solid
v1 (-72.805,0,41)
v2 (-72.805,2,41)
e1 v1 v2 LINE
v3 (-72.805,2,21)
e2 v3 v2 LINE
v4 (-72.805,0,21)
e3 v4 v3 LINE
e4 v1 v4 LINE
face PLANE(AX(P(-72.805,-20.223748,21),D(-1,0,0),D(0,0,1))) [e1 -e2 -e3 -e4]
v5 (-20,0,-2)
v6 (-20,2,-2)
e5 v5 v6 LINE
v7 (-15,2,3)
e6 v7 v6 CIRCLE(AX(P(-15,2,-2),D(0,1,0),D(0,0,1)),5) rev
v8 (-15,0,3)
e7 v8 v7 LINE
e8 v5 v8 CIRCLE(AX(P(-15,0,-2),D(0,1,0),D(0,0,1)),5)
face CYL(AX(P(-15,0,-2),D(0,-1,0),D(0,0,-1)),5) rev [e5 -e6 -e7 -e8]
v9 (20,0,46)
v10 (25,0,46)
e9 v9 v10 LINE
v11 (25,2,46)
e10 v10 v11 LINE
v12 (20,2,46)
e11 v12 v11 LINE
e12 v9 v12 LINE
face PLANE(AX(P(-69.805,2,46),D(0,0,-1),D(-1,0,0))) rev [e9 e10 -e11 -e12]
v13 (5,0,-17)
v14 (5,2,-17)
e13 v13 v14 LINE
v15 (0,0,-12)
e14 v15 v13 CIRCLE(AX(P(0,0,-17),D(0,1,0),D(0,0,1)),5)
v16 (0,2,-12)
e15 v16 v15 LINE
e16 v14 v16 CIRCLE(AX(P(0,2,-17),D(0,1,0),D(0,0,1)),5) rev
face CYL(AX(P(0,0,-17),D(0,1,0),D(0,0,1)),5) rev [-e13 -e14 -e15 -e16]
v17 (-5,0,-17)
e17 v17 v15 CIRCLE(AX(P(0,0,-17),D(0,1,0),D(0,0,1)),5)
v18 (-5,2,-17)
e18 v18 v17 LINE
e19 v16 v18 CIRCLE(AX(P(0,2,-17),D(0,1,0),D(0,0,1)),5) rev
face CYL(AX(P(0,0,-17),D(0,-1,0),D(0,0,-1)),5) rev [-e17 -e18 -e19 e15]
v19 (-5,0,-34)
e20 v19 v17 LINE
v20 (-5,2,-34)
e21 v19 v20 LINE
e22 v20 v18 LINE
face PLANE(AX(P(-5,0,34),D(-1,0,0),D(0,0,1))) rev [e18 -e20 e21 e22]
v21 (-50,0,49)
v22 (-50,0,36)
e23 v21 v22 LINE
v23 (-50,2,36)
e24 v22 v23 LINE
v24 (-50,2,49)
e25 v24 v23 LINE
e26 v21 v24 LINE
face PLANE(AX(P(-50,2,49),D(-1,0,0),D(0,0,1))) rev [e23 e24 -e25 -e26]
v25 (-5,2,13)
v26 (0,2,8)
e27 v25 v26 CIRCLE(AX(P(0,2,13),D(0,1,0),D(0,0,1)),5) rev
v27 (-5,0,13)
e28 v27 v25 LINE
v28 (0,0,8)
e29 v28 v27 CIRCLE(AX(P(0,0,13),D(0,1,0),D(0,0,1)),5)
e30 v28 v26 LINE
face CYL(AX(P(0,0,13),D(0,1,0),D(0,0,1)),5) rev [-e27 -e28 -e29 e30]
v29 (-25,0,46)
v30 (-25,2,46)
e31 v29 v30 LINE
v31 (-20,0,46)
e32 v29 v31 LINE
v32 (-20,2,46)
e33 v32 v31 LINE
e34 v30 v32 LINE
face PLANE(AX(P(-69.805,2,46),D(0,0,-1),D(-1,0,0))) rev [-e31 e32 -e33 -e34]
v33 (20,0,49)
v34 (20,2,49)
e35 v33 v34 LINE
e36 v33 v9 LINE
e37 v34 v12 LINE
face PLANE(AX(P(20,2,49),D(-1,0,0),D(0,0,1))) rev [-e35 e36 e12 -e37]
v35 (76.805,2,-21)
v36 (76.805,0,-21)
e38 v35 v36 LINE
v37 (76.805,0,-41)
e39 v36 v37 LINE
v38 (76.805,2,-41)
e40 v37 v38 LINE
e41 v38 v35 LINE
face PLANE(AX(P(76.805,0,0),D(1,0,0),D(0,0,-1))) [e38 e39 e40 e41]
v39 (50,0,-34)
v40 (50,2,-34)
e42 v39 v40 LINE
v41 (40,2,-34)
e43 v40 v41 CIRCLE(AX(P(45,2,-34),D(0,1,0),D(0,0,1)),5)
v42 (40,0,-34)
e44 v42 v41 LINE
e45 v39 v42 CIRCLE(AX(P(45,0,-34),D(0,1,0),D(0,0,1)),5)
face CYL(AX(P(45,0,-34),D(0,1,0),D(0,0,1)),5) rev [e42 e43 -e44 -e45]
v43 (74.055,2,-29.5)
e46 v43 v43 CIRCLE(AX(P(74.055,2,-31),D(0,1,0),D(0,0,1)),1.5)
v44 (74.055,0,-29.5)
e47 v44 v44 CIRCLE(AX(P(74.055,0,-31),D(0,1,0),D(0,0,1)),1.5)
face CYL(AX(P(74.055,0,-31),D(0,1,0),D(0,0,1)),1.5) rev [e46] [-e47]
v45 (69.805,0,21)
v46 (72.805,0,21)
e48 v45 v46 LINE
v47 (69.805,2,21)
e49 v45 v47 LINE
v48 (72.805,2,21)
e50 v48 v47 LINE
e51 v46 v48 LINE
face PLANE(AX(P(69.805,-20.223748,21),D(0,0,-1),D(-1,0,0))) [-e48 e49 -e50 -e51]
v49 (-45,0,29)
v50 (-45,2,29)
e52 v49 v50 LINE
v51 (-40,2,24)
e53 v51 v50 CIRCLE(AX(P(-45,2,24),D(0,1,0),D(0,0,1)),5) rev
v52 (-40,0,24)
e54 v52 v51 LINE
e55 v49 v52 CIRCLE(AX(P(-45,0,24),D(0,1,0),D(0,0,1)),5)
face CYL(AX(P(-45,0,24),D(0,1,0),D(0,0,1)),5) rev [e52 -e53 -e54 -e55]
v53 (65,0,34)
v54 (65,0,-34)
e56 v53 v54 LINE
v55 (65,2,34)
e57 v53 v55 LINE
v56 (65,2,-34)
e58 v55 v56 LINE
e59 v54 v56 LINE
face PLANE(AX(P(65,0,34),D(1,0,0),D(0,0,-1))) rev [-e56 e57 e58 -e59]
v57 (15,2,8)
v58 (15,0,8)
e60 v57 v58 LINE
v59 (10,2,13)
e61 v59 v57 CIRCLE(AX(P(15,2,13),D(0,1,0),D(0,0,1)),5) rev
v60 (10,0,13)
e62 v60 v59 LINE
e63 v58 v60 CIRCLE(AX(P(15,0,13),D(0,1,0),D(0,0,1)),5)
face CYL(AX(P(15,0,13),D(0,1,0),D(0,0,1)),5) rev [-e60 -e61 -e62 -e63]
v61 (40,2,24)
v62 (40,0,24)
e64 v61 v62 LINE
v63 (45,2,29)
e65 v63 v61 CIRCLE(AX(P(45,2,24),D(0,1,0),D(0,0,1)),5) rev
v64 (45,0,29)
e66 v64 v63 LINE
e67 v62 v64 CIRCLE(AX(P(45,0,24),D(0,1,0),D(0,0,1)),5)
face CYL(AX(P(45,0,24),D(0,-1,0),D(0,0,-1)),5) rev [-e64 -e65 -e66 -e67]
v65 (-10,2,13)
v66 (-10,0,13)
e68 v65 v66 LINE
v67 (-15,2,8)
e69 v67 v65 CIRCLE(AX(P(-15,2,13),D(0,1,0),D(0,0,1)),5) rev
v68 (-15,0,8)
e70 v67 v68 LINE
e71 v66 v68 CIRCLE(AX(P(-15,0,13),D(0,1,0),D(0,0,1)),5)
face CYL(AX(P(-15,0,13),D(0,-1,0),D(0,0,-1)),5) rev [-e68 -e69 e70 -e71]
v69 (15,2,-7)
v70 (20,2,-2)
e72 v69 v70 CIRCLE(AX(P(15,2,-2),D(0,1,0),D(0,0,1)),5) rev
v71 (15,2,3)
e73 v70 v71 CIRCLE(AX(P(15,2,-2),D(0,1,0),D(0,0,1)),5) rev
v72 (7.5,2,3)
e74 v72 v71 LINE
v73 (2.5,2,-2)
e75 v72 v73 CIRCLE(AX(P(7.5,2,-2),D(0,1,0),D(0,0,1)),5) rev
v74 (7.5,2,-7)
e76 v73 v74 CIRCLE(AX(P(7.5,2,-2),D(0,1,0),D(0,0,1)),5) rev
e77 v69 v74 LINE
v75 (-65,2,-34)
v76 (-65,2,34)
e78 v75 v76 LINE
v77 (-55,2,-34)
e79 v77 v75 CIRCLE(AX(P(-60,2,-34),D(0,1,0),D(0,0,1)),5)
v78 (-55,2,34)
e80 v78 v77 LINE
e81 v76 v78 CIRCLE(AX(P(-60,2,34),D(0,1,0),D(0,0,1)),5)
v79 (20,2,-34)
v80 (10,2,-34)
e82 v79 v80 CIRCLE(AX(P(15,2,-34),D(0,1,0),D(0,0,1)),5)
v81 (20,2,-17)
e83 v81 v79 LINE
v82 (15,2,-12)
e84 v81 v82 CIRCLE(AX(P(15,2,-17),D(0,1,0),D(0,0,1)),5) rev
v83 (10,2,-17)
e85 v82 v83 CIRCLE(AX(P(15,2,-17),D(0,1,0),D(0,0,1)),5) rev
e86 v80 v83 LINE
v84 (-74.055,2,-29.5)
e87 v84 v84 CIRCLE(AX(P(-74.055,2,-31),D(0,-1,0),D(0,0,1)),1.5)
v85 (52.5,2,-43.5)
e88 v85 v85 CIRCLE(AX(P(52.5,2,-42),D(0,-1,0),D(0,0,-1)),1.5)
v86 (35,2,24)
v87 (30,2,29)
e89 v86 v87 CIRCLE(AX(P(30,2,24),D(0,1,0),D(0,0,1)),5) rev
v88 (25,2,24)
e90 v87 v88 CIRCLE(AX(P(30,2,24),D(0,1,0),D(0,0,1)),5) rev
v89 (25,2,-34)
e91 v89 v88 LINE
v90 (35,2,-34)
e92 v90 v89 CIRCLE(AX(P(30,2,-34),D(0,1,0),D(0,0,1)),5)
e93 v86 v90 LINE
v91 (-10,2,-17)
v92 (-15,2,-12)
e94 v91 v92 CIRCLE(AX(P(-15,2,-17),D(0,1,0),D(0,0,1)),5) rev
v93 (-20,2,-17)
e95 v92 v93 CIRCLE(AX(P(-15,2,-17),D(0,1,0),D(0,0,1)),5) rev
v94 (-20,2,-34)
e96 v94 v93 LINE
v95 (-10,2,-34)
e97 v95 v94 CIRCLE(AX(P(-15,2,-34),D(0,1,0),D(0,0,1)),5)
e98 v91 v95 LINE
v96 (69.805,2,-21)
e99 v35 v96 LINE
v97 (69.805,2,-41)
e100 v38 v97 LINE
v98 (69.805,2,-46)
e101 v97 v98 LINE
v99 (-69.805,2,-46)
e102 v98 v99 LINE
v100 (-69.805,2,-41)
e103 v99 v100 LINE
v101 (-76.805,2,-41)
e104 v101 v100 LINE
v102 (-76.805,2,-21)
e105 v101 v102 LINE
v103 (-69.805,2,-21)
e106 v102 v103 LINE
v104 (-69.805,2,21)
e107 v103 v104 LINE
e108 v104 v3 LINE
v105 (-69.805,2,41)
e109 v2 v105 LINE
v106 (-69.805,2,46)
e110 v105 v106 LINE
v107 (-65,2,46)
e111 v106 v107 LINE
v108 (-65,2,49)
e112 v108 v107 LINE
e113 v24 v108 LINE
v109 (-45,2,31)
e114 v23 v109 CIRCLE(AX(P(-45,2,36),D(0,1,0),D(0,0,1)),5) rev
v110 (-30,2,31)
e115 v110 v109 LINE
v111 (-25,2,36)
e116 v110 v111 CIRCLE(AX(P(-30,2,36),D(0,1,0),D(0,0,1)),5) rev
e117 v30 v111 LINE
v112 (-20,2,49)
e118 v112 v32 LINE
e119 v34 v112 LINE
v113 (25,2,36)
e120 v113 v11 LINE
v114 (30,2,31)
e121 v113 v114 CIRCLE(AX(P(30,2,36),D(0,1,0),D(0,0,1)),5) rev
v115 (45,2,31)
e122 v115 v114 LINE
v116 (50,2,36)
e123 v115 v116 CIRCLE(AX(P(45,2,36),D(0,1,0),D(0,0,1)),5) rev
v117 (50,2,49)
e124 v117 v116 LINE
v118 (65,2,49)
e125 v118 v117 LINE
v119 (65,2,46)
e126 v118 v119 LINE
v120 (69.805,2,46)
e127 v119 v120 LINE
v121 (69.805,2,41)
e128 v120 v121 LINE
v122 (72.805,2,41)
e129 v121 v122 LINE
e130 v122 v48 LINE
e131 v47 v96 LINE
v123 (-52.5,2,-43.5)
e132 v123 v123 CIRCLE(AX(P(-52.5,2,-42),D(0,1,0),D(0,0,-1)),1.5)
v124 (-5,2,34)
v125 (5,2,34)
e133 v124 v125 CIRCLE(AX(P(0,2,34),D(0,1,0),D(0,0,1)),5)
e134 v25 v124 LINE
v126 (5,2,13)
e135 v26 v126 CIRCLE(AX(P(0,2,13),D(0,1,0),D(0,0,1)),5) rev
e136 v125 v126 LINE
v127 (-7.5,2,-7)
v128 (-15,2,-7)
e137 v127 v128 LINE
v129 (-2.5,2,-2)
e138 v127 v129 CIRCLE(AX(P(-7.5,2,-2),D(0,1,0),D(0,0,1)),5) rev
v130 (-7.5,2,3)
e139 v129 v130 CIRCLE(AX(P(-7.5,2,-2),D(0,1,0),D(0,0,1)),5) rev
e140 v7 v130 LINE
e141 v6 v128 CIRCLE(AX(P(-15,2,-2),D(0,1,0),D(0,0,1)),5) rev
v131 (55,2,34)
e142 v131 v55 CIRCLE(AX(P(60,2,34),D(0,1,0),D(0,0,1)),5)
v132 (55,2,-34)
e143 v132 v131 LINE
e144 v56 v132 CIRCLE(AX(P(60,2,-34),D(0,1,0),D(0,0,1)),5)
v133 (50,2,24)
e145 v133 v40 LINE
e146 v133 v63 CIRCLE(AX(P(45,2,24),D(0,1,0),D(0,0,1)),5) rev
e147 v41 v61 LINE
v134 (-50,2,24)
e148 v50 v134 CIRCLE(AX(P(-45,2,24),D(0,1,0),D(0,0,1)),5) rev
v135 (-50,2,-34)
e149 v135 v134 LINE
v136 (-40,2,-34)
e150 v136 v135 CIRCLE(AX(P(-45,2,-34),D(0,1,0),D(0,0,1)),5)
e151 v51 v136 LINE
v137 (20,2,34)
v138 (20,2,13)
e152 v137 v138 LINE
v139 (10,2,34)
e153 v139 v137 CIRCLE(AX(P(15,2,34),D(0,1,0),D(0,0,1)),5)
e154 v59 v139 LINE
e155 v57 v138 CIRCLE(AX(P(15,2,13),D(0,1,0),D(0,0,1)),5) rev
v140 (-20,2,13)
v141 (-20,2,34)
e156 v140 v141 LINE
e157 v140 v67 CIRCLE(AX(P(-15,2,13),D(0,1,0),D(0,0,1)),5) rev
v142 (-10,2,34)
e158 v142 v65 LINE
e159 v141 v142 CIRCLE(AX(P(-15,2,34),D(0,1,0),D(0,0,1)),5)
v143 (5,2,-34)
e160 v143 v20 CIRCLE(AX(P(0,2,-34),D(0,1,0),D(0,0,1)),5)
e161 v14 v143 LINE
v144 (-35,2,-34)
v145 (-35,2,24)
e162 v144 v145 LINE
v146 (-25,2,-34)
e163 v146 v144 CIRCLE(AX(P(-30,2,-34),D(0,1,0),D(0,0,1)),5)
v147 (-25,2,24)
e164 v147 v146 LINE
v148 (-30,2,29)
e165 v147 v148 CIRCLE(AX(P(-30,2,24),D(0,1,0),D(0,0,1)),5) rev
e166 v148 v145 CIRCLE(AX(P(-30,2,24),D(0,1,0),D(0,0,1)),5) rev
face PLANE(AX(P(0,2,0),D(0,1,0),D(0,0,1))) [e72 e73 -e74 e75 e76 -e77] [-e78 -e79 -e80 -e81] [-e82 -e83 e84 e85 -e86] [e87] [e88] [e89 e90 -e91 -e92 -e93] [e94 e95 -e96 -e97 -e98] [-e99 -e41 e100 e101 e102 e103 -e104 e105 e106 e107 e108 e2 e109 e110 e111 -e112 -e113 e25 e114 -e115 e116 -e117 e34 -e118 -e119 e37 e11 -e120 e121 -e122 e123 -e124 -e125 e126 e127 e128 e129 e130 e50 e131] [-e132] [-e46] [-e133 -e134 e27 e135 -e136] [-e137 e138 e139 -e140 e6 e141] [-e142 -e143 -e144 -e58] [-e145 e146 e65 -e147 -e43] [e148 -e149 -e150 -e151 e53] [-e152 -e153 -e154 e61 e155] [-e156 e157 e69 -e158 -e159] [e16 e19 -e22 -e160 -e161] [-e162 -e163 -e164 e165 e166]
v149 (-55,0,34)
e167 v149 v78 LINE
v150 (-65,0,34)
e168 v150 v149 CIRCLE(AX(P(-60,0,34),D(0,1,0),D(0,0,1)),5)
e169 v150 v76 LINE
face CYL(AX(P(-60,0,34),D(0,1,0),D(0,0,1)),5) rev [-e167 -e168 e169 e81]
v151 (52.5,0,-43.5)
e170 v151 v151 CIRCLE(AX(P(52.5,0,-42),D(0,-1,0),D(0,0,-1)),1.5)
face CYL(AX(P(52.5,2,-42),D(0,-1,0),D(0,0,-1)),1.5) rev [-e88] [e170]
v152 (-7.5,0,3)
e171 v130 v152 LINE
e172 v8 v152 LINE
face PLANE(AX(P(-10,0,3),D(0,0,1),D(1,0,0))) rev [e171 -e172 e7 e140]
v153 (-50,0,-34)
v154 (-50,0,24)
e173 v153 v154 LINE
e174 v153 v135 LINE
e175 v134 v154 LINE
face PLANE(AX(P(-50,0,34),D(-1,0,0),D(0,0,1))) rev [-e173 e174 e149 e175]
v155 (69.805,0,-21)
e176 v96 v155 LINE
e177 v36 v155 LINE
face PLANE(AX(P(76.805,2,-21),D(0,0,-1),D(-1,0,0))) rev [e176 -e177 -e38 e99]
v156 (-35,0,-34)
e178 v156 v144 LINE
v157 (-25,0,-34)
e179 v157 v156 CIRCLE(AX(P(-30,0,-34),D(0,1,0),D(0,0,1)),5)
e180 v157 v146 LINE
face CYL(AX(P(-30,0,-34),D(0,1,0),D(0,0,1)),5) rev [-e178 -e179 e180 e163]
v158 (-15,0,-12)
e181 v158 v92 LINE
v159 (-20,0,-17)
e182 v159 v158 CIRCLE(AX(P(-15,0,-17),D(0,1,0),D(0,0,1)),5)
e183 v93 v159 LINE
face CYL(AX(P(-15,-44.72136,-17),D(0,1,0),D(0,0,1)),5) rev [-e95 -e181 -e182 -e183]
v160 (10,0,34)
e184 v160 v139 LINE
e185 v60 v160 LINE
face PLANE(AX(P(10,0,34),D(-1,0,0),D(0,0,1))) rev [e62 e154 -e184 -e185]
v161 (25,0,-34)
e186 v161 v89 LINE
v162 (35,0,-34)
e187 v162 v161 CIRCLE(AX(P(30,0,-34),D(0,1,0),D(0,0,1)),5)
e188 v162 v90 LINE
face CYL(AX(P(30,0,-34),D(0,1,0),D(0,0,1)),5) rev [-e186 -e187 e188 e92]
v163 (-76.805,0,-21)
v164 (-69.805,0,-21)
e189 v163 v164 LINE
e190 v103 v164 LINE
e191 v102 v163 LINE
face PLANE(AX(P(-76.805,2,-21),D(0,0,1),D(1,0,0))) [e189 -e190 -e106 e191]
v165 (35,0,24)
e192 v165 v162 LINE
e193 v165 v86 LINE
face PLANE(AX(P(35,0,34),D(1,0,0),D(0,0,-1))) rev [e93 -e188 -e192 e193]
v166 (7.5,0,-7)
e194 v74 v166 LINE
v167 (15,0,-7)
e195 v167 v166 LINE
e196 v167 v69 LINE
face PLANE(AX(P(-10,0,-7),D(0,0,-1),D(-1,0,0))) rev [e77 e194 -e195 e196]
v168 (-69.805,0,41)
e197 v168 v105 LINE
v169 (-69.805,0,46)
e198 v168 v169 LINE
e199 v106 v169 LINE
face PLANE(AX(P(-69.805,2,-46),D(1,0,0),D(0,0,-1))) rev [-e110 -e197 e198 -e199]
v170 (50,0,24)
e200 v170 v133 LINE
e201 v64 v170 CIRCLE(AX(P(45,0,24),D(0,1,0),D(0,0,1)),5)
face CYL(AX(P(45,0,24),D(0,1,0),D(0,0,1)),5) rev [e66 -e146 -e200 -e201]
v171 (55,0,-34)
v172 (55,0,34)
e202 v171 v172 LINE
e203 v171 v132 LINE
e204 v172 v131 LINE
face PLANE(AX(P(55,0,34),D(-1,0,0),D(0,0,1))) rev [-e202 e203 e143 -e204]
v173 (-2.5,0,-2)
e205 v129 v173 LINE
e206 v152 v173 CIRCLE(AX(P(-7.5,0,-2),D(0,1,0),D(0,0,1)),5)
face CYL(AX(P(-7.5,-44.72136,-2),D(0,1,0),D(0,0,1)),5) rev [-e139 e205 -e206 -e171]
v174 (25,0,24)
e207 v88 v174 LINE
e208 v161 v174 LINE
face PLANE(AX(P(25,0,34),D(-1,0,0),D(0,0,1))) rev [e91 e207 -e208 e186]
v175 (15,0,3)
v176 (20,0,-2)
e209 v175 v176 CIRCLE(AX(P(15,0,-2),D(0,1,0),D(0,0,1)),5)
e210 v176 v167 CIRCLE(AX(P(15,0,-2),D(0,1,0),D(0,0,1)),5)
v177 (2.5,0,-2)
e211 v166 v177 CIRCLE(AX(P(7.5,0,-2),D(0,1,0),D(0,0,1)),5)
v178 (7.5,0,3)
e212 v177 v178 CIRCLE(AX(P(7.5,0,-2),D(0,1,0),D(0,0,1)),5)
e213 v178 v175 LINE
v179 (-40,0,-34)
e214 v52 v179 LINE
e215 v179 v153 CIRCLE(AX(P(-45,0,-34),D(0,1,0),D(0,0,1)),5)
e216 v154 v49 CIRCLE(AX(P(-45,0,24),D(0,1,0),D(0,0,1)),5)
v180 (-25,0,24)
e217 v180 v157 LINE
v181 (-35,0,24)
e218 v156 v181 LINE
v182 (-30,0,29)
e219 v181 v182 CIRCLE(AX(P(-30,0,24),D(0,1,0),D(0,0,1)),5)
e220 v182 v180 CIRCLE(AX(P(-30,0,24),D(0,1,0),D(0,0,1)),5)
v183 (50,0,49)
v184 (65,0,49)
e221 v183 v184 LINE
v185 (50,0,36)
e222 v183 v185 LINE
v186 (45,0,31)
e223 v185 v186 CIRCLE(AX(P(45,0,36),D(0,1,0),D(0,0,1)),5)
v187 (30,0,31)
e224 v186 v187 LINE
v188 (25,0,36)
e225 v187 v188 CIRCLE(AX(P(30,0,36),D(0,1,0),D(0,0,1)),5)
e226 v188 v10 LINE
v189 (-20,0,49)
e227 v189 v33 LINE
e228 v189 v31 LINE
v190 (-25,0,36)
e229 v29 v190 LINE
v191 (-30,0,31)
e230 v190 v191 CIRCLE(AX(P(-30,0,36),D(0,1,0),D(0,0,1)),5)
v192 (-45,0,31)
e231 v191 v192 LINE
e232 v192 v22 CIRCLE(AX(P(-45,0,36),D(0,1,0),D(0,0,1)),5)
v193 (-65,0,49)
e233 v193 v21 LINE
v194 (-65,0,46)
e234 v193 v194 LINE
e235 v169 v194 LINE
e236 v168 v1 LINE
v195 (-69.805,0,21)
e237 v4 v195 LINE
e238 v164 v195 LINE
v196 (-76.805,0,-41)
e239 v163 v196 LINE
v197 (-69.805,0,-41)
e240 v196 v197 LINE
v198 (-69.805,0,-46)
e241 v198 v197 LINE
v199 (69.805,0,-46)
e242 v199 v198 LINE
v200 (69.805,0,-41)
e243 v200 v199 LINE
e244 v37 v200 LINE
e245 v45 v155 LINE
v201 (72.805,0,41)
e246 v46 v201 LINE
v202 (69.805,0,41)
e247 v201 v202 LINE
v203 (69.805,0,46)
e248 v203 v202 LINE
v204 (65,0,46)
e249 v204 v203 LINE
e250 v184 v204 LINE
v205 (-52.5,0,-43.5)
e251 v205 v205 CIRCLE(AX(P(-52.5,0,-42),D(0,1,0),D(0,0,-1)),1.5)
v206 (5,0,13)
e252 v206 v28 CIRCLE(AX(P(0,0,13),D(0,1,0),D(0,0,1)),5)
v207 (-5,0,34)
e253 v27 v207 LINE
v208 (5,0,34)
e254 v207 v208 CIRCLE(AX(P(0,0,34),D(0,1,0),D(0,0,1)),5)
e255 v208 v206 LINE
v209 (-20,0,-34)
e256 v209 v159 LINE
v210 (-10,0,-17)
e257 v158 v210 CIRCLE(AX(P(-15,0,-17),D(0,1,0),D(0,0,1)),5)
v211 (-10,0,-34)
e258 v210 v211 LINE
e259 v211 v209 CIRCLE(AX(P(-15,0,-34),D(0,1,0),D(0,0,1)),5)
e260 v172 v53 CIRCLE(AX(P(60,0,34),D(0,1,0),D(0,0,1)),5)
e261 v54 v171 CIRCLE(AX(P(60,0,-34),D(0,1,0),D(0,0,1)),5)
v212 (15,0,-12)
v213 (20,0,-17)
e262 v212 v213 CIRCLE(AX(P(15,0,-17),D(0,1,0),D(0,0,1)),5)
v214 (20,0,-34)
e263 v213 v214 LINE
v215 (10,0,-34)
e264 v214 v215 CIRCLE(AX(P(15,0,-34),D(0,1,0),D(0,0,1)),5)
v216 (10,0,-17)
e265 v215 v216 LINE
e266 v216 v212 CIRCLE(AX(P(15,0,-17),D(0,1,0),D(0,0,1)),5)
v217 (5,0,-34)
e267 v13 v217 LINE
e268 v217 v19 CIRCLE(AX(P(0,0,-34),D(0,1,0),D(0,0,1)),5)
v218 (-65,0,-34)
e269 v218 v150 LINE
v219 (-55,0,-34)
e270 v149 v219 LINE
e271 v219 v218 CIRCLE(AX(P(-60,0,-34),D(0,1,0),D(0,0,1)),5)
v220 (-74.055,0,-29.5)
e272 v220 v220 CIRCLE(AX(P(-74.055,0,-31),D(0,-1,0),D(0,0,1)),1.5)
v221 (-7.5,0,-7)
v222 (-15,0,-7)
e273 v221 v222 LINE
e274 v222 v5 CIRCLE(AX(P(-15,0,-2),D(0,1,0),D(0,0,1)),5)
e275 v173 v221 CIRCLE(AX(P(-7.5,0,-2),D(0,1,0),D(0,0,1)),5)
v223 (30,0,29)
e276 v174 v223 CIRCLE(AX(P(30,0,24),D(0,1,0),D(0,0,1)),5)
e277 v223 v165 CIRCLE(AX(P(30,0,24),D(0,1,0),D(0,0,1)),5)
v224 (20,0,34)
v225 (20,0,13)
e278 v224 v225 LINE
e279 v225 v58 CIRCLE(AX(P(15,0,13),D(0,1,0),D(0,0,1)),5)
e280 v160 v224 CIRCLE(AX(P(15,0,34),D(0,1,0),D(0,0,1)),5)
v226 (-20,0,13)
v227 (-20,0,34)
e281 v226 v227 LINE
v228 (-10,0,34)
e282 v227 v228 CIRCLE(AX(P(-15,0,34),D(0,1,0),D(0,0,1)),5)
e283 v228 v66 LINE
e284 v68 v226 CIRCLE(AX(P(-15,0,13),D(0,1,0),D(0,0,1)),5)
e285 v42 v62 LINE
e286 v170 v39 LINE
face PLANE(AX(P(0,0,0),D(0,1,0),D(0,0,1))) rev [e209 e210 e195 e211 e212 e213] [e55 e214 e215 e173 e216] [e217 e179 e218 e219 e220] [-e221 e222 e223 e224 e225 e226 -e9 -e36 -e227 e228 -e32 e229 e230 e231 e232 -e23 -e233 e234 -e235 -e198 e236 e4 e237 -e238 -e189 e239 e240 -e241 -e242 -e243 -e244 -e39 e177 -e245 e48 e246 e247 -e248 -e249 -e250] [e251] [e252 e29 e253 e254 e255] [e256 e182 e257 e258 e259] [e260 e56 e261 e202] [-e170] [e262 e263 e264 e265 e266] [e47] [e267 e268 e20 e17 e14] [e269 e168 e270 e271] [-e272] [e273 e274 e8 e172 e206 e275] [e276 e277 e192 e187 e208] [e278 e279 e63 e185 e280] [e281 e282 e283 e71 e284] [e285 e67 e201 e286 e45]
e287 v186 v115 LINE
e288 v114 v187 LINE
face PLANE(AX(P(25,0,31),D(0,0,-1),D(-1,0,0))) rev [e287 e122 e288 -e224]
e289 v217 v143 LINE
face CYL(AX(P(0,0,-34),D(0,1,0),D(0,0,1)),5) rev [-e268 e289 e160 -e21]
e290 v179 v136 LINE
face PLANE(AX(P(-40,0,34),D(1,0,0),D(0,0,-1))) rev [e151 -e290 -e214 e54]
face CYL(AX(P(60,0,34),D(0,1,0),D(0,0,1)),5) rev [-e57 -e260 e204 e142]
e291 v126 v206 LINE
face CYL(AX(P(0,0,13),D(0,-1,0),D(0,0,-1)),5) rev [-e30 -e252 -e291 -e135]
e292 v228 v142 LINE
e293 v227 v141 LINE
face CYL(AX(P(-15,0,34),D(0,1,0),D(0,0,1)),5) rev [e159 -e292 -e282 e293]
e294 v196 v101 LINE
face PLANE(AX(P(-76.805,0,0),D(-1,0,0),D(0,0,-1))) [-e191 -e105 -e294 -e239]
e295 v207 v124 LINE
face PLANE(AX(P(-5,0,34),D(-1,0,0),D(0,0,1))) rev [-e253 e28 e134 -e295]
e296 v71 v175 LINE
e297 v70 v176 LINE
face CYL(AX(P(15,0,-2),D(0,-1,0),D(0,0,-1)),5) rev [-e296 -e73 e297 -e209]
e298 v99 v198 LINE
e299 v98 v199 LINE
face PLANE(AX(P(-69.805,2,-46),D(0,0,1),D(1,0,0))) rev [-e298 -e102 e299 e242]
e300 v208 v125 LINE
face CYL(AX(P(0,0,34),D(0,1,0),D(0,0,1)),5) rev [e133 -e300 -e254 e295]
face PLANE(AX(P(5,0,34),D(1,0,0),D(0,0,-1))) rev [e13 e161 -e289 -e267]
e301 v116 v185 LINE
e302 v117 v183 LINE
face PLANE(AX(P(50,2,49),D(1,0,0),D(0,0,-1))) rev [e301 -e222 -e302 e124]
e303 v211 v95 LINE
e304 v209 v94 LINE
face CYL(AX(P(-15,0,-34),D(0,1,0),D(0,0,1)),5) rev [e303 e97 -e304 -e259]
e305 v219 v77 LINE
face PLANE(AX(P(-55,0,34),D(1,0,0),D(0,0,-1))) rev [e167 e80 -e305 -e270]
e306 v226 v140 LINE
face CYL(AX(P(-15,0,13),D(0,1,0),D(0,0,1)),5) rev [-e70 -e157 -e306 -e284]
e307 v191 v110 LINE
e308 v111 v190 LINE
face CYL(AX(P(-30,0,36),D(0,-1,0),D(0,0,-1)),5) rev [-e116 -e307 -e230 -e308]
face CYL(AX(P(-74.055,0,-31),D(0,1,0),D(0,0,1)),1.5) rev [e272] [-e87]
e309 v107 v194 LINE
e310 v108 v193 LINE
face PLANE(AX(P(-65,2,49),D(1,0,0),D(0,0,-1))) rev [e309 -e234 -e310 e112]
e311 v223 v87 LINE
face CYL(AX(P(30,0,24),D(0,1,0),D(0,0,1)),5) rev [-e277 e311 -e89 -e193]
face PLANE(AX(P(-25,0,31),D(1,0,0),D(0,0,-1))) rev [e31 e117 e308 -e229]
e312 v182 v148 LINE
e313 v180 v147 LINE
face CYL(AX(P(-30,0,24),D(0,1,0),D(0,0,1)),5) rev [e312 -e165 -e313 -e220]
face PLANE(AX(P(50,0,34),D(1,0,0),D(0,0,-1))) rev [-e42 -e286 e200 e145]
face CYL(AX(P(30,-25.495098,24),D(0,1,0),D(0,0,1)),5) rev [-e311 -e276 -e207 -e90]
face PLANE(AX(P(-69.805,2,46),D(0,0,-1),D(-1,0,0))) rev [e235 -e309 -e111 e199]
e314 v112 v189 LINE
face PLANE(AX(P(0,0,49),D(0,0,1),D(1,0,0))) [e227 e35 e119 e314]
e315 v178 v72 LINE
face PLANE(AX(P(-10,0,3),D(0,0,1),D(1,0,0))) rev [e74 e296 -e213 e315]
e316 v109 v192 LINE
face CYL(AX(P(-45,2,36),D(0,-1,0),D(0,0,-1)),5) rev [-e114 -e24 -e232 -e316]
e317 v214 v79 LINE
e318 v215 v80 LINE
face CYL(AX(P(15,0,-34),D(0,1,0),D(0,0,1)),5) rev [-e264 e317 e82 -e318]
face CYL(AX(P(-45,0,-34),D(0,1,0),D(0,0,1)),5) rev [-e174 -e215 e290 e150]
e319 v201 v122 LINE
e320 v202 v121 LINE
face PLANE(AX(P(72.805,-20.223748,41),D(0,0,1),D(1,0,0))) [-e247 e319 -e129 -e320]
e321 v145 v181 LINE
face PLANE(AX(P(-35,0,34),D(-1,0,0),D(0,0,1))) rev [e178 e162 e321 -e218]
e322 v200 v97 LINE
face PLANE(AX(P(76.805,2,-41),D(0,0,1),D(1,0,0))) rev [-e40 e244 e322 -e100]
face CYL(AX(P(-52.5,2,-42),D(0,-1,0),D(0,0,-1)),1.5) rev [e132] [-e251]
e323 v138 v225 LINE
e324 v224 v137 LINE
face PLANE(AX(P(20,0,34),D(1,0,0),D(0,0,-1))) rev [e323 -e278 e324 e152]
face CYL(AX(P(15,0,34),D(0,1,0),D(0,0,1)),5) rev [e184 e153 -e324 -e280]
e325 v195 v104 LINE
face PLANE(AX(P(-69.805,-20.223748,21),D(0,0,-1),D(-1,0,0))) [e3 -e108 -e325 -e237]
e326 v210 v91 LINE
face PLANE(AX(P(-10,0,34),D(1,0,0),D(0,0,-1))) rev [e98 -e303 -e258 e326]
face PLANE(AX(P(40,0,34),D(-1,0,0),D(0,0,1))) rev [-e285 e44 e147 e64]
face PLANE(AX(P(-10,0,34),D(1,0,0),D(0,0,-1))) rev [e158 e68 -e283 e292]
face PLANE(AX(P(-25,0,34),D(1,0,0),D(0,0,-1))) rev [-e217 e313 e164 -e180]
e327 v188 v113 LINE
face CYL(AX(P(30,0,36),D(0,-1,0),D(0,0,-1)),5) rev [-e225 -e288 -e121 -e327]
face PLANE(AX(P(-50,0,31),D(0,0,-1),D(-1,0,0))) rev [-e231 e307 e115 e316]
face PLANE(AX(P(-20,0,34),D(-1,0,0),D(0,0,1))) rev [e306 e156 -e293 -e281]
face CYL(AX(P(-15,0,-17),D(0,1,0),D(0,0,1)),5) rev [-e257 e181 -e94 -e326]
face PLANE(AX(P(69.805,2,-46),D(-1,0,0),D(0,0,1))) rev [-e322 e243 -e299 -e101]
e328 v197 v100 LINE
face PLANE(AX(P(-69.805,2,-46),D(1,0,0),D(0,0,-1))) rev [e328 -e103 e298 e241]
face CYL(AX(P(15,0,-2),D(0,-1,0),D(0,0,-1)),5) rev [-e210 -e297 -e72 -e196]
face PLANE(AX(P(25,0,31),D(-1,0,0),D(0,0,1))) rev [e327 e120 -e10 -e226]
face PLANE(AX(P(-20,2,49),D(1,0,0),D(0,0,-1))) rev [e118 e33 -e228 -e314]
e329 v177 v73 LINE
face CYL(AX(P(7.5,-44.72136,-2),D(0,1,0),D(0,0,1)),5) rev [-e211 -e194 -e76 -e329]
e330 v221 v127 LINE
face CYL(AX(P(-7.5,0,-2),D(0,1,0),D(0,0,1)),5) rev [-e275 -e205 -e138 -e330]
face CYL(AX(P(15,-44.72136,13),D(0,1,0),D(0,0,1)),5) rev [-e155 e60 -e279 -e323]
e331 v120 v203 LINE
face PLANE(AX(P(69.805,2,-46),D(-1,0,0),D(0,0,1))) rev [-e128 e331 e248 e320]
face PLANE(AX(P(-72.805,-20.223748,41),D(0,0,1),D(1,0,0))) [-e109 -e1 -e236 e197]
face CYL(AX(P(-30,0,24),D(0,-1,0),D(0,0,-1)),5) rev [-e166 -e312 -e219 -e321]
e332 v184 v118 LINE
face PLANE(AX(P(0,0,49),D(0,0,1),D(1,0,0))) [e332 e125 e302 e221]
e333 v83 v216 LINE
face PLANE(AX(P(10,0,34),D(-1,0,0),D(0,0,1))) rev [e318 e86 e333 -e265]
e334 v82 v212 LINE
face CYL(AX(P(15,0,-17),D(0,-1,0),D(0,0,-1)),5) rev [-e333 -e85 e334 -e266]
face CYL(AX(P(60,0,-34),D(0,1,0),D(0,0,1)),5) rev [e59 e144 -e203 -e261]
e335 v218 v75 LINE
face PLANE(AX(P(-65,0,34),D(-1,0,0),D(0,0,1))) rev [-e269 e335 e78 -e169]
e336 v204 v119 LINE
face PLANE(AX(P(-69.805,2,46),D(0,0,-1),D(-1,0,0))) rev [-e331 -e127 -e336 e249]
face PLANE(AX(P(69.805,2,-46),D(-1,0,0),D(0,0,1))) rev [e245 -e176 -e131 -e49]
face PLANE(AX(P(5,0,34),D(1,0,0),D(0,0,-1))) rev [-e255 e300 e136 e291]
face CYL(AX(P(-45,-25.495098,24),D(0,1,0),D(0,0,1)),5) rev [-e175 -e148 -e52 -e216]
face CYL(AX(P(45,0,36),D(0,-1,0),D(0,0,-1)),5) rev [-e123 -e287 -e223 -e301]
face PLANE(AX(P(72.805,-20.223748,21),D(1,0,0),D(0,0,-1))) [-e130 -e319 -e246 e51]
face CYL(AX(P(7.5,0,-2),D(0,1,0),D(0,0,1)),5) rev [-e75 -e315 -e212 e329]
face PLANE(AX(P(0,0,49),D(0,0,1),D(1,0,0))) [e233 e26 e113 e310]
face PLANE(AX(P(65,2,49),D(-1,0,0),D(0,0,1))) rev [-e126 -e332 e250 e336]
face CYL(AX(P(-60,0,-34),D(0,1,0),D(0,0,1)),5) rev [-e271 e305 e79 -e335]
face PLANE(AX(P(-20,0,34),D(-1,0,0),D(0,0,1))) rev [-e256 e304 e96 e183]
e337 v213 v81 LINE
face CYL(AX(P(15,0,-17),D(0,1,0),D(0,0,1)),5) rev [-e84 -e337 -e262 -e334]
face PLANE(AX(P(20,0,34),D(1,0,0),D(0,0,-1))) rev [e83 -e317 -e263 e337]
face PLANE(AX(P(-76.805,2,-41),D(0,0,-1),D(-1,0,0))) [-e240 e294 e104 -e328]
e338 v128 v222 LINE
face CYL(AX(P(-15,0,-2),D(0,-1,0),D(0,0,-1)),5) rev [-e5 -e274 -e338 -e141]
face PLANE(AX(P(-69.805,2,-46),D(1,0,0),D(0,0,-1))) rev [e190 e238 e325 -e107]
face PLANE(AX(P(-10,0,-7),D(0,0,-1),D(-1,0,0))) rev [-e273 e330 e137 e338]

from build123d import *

# Parameters (mm, degrees)
SKETCH_1_W             = 139.61
SKETCH_1_H             = 92
EXTRUDE_1_DEPTH        = 2
SKETCH_2_W             = 40
SKETCH_2_H             = 2
SKETCH_2_W_2           = 15
EXTRUDE_2_DEPTH        = 3
SKETCH_3_W             = 20
SKETCH_3_H             = 2
EXTRUDE_3_DEPTH        = 7
SKETCH_4_R             = 1.5
CUT_EXTRUDE_1_DEPTH    = 92.126330031
CUT_EXTRUDE_2_DEPTH    = 92.126330031
PATTERN_LINEAR_1_COUNT = 9
PATTERN_LINEAR_1_PITCH = 15
SKETCH_8_R             = 1.5
CUT_EXTRUDE_4_DEPTH    = 92.126330031
SKETCH_10_W            = 25
SKETCH_10_H            = 5
EXTRUDE_5_DEPTH        = 2
SKETCH_12_W            = 25
SKETCH_12_H            = 15
CUT_EXTRUDE_5_DEPTH    = 92.126330031
FILLET_1_R             = 5
CUT_EXTRUDE_6_DEPTH    = 92.126330031
EXTRUDE_6_DEPTH        = 2
FILLET_2_R             = 5
SKETCH_15_W            = 3
SKETCH_15_H            = 20
EXTRUDE_7_DEPTH        = 2


with BuildPart() as part:
    # 草图1 → 凸台-拉伸1 (new body)
    with BuildSketch(Plane(origin=(0, 0, 0), x_dir=(1, 0, 0), z_dir=(0, 1, 0))):
        Rectangle(SKETCH_1_W, SKETCH_1_H)
    extrude(amount=EXTRUDE_1_DEPTH)

    # 草图2 → 凸台-拉伸2 (add)
    with BuildSketch(Plane.XY.offset(46)):
        with Locations((0, 1)):
            Rectangle(SKETCH_2_W, SKETCH_2_H)
        with Locations((57.5, 1)):
            Rectangle(SKETCH_2_W_2, SKETCH_2_H)
        with Locations((-57.5, 1)):
            Rectangle(SKETCH_2_W_2, SKETCH_2_H)
    extrude(amount=EXTRUDE_2_DEPTH)

    # 草图3 → 凸台-拉伸3 (add)
    with BuildSketch(Plane(origin=(69.805, 0, 0), x_dir=(0, 0, -1), z_dir=(1, 0, 0))):
        with Locations((31, 1)):
            Rectangle(SKETCH_3_W, SKETCH_3_H)
    extrude_3 = extrude(amount=EXTRUDE_3_DEPTH)

    # 草图4 → 切除-拉伸1 (cut, through all)
    with BuildSketch(Plane(origin=(0, 2, 0), x_dir=(1, 0, 0), z_dir=(0, 1, 0))):
        with Locations(Location((74.055, 31, 0), (0, 0, 270))):
            Circle(SKETCH_4_R)
    cut_extrude_1 = extrude(amount=-CUT_EXTRUDE_1_DEPTH, mode=Mode.SUBTRACT)

    # 草图5 → 切除-拉伸2 (cut, through all)
    with BuildSketch(Plane(origin=(0, 2, 0), x_dir=(1, 0, 0), z_dir=(0, 1, 0))):
        with BuildLine():
            Line((-65, -34), (-65, 34))
            ThreePointArc((-65, 34), (-60, 39), (-55, 34))
            Line((-55, 34), (-55, -34))
            ThreePointArc((-55, -34), (-60, -39), (-65, -34))
        make_face()
    cut_extrude_2 = extrude(amount=-CUT_EXTRUDE_2_DEPTH, mode=Mode.SUBTRACT)

    # 阵列(线性)1: 切除-拉伸2 ×9
    with Locations(*[(i * PATTERN_LINEAR_1_PITCH, 0, 0) for i in range(1, PATTERN_LINEAR_1_COUNT)]):
        add(cut_extrude_2, mode=Mode.SUBTRACT)

    # 草图8 → 切除-拉伸4 (cut, through all)
    with BuildSketch(Plane.XZ):
        with Locations(Location((52.5, -42, 0), (0, 0, 270))):
            Circle(SKETCH_8_R)
    cut_extrude_4 = extrude(amount=-CUT_EXTRUDE_4_DEPTH, mode=Mode.SUBTRACT)

    # 镜向4: 切除-拉伸4 across plane
    add(cut_extrude_4.mirror(Plane(origin=(0, 0, 0), x_dir=(0, 0, 1), z_dir=(1, 0, 0))), mode=Mode.SUBTRACT)

    # 草图10 → 凸台-拉伸5 (add)
    with BuildSketch(Plane(origin=(0, 2, 0), x_dir=(1, 0, 0), z_dir=(0, 1, 0))):
        with Locations((37.5, -31.5)):
            Rectangle(SKETCH_10_W, SKETCH_10_H)
        with Locations((-37.5, -31.5)):
            Rectangle(SKETCH_10_W, SKETCH_10_H)
    extrude(amount=-EXTRUDE_5_DEPTH)

    # 草图12 → 切除-拉伸5 (cut, through all)
    with BuildSketch(Plane(origin=(0, 2, 0), x_dir=(1, 0, 0), z_dir=(0, 1, 0))):
        with Locations((-37.5, -38.5)):
            Rectangle(SKETCH_12_W, SKETCH_12_H)
        with Locations((37.5, -38.5)):
            Rectangle(SKETCH_12_W, SKETCH_12_H)
    extrude(amount=-CUT_EXTRUDE_5_DEPTH, mode=Mode.SUBTRACT)

    # 圆角1
    fillet_1_edges = [part.edges().sort_by_distance(p)[0] for p in [
        (-40, 1, 29),
        (-50, 1, 29),
        (-25, 1, 31),
        (-50, 1, 31),
        (50, 1, 31),
        (25, 1, 31),
        (50, 1, 29),
        (40, 1, 29),
        (35, 1, 29),
        (25, 1, 29),
        (-25, 1, 29),
        (-35, 1, 29),
    ]]
    fillet(fillet_1_edges, radius=FILLET_1_R - 0.0001)  # a hair under: the kernel refuses the full size

    # 草图13 → 切除-拉伸6 (cut, through all)
    with BuildSketch(Plane(origin=(0, 2, 0), x_dir=(1, 0, 0), z_dir=(0, 1, 0))):
        with BuildLine():
            Line((-10, 7), (10, 7))
            ThreePointArc((10, 7), (15, 2), (10, -3))
            Line((10, -3), (-10, -3))
            ThreePointArc((-10, -3), (-15, 2), (-10, 7))
        make_face()
    extrude(amount=-CUT_EXTRUDE_6_DEPTH, mode=Mode.SUBTRACT)

    # 草图14 → 凸台-拉伸6 (add)
    with BuildSketch(Plane(origin=(0, 2, 0), x_dir=(1, 0, 0), z_dir=(0, 1, 0))):
        Polygon((20, 7), (2.5, 7), (2.5, -3), (20, -3), (20, -8), (-20, -8), (-20, -3), (-2.5, -3), (-2.5, 7), (-20, 7), (-20, 12), (20, 12), align=None)
    extrude(amount=-EXTRUDE_6_DEPTH)

    # 圆角2
    fillet_2_edges = [part.edges().sort_by_distance(p)[0] for p in [
        (-10, 1, -12),
        (-20, 1, -12),
        (-5, 1, -12),
        (5, 1, -12),
        (10, 1, -12),
        (20, 1, -12),
        (20, 1, 3),
        (20, 1, -7),
        (20, 1, 8),
        (10, 1, 8),
        (-5, 1, 8),
        (5, 1, 8),
        (-10, 1, 8),
        (-20, 1, 8),
        (2.5, 1, 3),
        (2.5, 1, -7),
        (-2.5, 1, 3),
        (-2.5, 1, -7),
        (-20, 1, 3),
        (-20, 1, -7),
    ]]
    fillet(fillet_2_edges, radius=FILLET_2_R - 0.0001)  # a hair under: the kernel refuses the full size

    # 镜向5: 凸台-拉伸3, 切除-拉伸1 across plane
    add(extrude_3.mirror(Plane(origin=(0, 0, 0), x_dir=(0, 0, 1), z_dir=(1, 0, 0))))
    add(cut_extrude_1.mirror(Plane(origin=(0, 0, 0), x_dir=(0, 0, 1), z_dir=(1, 0, 0))), mode=Mode.SUBTRACT)

    # 草图15 → 凸台-拉伸7 (add)
    with BuildSketch(Plane(origin=(0, 2, 0), x_dir=(1, 0, 0), z_dir=(0, 1, 0))):
        with Locations((71.305, -31)):
            Rectangle(SKETCH_15_W, SKETCH_15_H)
        with Locations((-71.305, -31)):
            Rectangle(SKETCH_15_W, SKETCH_15_H)
    extrude(amount=-EXTRUDE_7_DEPTH)


solid = part.part
